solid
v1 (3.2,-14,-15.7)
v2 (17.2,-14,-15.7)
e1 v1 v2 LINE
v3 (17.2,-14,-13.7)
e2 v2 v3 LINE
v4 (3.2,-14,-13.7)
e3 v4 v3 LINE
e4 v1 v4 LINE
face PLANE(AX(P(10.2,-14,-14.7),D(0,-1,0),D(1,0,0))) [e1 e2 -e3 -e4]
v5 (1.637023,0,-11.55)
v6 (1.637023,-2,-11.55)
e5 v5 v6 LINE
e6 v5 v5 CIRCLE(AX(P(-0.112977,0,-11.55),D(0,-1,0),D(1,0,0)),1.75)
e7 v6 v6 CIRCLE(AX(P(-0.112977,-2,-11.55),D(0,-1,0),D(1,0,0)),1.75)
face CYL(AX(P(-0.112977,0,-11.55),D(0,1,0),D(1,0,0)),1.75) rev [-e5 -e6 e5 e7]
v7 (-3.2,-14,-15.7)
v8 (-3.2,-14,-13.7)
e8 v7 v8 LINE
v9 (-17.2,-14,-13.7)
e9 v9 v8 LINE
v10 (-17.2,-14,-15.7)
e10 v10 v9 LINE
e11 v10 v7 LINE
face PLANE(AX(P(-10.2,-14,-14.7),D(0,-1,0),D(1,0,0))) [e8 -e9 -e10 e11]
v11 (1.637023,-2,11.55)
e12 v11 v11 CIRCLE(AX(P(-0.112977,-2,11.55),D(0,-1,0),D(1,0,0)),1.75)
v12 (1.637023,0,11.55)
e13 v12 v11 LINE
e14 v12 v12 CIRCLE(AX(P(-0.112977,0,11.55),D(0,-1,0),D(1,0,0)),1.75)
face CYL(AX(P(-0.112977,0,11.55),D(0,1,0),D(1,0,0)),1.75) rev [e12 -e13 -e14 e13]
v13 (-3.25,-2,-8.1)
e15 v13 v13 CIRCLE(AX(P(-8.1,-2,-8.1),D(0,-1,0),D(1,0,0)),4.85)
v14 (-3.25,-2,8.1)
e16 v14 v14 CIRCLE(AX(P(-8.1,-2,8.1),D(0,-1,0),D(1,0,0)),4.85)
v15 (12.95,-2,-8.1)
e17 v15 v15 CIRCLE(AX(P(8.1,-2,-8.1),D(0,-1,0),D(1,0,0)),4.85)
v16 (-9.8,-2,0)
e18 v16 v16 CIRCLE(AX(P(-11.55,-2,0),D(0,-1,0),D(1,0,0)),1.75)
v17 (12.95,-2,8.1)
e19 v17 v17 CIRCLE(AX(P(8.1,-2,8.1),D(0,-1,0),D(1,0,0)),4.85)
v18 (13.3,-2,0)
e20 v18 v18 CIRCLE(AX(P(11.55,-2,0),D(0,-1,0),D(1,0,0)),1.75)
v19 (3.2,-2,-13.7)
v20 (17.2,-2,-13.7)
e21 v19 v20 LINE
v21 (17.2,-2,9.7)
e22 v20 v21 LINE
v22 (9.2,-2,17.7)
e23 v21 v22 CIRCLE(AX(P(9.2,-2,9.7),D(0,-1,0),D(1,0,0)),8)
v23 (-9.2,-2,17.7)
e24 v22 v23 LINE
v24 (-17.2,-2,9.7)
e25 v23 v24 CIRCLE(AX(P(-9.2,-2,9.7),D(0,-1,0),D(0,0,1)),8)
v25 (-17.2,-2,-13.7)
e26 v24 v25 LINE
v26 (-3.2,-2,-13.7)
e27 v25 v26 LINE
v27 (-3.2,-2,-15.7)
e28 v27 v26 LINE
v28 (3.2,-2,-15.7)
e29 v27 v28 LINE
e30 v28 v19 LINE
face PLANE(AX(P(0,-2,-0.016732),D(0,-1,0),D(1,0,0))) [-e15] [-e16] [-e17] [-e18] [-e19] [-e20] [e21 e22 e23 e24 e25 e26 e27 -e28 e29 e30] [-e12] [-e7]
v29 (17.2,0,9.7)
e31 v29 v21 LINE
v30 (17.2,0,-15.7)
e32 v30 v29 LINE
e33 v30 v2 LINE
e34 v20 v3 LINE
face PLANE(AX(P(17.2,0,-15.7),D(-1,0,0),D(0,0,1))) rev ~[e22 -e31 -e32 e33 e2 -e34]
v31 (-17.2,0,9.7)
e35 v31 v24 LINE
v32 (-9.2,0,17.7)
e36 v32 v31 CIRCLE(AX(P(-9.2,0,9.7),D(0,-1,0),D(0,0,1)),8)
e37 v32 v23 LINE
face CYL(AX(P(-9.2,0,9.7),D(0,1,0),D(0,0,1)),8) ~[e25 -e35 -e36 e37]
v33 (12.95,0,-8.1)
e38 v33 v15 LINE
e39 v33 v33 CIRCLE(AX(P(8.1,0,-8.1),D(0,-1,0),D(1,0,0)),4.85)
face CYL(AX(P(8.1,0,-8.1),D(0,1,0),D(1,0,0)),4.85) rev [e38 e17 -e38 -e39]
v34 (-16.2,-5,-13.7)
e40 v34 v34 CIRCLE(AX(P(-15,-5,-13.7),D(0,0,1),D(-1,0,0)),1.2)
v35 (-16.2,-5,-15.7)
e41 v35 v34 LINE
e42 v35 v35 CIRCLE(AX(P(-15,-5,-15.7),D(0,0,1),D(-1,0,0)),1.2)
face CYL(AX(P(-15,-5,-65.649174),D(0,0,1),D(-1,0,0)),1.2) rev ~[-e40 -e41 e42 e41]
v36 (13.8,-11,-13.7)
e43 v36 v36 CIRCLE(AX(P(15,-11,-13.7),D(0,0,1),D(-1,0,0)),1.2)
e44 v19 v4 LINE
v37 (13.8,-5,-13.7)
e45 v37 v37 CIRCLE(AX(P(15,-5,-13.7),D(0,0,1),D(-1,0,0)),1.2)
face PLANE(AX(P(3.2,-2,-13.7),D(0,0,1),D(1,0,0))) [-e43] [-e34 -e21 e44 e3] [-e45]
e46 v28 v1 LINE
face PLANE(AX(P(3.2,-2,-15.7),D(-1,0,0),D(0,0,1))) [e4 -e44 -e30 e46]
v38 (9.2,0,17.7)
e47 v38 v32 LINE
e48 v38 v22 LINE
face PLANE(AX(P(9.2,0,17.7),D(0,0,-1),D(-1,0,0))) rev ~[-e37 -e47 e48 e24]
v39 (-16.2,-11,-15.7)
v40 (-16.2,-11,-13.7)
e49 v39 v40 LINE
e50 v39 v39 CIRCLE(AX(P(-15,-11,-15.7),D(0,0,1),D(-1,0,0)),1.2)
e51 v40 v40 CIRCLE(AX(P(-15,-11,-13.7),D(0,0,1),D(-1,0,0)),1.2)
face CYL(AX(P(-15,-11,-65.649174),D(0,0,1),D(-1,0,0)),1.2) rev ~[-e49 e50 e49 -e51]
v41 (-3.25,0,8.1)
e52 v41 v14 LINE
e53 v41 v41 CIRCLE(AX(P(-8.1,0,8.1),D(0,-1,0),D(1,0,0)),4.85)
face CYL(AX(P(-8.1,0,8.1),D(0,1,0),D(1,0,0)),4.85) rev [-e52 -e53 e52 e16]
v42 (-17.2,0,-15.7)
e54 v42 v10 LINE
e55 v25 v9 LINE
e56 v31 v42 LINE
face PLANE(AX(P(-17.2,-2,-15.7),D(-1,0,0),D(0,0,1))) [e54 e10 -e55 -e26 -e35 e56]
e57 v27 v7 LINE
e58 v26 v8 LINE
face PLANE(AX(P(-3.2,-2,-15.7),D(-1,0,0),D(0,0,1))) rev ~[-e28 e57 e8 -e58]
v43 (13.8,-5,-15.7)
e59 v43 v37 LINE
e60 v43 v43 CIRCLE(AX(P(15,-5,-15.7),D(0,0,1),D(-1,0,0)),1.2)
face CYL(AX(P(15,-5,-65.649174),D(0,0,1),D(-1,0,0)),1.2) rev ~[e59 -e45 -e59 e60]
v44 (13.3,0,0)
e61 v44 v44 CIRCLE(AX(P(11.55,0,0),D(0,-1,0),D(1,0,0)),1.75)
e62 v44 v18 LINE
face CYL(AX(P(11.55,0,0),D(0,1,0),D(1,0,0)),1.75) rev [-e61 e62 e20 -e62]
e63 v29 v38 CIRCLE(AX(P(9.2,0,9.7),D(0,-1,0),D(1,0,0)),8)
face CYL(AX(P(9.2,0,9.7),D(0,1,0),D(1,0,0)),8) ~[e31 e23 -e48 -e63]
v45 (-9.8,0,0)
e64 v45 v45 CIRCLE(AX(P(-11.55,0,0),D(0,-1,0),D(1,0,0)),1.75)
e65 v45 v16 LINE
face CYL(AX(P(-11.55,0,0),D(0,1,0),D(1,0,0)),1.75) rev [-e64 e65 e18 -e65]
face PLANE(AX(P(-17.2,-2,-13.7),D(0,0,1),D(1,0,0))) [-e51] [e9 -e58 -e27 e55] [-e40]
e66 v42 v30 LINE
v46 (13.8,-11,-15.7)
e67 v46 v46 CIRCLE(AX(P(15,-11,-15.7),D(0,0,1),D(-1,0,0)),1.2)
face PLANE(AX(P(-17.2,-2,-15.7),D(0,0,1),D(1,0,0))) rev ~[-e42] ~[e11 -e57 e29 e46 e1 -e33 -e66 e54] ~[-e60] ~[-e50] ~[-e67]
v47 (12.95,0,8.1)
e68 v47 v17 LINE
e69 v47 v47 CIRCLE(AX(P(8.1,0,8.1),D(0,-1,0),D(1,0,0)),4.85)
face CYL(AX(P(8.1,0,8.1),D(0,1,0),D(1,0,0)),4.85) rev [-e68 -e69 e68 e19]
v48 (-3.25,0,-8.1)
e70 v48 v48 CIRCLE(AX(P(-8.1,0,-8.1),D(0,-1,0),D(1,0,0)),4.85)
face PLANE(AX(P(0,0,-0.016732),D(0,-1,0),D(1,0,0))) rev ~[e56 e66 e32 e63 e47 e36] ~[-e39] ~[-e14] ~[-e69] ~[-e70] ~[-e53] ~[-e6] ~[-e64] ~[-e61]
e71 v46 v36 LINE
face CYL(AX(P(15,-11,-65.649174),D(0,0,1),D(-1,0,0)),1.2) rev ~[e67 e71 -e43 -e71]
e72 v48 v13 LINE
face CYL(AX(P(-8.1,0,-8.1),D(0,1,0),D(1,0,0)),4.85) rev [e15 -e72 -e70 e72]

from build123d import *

# Parameters (mm, degrees)
F0_R     = 1.75
F0_R_2   = 4.85
F1_DEPTH = 2
F2_W     = 14
F2_H     = 2
F3_DEPTH = 12
F5_D     = 2.4


# Not quite as in the source:
# - a feature names something its author has since deleted; it is built from what else it names


with BuildPart() as f1:
    # F0 (on Front) → F1 (new body)
    with BuildSketch(Plane.XZ):
        with BuildLine():
            Line((9.2, 17.7), (-9.2, 17.7))
            ThreePointArc((-9.2, 17.7), (-14.8568542495, 15.3568542495), (-17.2, 9.7))
            Line((-17.2, 9.7), (-17.2, -15.7))
            Line((-17.2, -15.7), (17.2, -15.7))
            Line((17.2, -15.7), (17.2, 9.7))
            ThreePointArc((17.2, 9.7), (14.8568542495, 15.3568542495), (9.2, 17.7))
        make_face()
        with Locations((-0.1129766364, -11.55)):
            Circle(F0_R, mode=Mode.SUBTRACT)
        with Locations((-8.1, -8.1)):
            Circle(F0_R_2, mode=Mode.SUBTRACT)
        with Locations((-11.55, 0)):
            Circle(F0_R, mode=Mode.SUBTRACT)
        with Locations((8.1, -8.1)):
            Circle(F0_R_2, mode=Mode.SUBTRACT)
        with Locations((11.55, 0)):
            Circle(F0_R, mode=Mode.SUBTRACT)
        with Locations((-8.1, 8.1)):
            Circle(F0_R_2, mode=Mode.SUBTRACT)
        with Locations((-0.1129766364, 11.55)):
            Circle(F0_R, mode=Mode.SUBTRACT)
        with Locations((8.1, 8.1)):
            Circle(F0_R_2, mode=Mode.SUBTRACT)
    extrude(amount=F1_DEPTH)

    # F2 (on face) → F3 (join)
    with BuildSketch(Plane.XZ.offset(2)):
        with Locations((-10.2, -14.7)):
            Rectangle(F2_W, F2_H)
        with Locations((10.2, -14.7)):
            Rectangle(F2_W, F2_H)
    extrude(amount=F3_DEPTH)

    # F5 (through all)
    with Locations(Plane(origin=(0, 0, -15.7), x_dir=(1, 0, 0), z_dir=(0, 0, -1))):
        with Locations((-15, 11), (-15, 5), (15, 11), (15, 5)):
            Hole(F5_D / 2)


solid = f1.part
